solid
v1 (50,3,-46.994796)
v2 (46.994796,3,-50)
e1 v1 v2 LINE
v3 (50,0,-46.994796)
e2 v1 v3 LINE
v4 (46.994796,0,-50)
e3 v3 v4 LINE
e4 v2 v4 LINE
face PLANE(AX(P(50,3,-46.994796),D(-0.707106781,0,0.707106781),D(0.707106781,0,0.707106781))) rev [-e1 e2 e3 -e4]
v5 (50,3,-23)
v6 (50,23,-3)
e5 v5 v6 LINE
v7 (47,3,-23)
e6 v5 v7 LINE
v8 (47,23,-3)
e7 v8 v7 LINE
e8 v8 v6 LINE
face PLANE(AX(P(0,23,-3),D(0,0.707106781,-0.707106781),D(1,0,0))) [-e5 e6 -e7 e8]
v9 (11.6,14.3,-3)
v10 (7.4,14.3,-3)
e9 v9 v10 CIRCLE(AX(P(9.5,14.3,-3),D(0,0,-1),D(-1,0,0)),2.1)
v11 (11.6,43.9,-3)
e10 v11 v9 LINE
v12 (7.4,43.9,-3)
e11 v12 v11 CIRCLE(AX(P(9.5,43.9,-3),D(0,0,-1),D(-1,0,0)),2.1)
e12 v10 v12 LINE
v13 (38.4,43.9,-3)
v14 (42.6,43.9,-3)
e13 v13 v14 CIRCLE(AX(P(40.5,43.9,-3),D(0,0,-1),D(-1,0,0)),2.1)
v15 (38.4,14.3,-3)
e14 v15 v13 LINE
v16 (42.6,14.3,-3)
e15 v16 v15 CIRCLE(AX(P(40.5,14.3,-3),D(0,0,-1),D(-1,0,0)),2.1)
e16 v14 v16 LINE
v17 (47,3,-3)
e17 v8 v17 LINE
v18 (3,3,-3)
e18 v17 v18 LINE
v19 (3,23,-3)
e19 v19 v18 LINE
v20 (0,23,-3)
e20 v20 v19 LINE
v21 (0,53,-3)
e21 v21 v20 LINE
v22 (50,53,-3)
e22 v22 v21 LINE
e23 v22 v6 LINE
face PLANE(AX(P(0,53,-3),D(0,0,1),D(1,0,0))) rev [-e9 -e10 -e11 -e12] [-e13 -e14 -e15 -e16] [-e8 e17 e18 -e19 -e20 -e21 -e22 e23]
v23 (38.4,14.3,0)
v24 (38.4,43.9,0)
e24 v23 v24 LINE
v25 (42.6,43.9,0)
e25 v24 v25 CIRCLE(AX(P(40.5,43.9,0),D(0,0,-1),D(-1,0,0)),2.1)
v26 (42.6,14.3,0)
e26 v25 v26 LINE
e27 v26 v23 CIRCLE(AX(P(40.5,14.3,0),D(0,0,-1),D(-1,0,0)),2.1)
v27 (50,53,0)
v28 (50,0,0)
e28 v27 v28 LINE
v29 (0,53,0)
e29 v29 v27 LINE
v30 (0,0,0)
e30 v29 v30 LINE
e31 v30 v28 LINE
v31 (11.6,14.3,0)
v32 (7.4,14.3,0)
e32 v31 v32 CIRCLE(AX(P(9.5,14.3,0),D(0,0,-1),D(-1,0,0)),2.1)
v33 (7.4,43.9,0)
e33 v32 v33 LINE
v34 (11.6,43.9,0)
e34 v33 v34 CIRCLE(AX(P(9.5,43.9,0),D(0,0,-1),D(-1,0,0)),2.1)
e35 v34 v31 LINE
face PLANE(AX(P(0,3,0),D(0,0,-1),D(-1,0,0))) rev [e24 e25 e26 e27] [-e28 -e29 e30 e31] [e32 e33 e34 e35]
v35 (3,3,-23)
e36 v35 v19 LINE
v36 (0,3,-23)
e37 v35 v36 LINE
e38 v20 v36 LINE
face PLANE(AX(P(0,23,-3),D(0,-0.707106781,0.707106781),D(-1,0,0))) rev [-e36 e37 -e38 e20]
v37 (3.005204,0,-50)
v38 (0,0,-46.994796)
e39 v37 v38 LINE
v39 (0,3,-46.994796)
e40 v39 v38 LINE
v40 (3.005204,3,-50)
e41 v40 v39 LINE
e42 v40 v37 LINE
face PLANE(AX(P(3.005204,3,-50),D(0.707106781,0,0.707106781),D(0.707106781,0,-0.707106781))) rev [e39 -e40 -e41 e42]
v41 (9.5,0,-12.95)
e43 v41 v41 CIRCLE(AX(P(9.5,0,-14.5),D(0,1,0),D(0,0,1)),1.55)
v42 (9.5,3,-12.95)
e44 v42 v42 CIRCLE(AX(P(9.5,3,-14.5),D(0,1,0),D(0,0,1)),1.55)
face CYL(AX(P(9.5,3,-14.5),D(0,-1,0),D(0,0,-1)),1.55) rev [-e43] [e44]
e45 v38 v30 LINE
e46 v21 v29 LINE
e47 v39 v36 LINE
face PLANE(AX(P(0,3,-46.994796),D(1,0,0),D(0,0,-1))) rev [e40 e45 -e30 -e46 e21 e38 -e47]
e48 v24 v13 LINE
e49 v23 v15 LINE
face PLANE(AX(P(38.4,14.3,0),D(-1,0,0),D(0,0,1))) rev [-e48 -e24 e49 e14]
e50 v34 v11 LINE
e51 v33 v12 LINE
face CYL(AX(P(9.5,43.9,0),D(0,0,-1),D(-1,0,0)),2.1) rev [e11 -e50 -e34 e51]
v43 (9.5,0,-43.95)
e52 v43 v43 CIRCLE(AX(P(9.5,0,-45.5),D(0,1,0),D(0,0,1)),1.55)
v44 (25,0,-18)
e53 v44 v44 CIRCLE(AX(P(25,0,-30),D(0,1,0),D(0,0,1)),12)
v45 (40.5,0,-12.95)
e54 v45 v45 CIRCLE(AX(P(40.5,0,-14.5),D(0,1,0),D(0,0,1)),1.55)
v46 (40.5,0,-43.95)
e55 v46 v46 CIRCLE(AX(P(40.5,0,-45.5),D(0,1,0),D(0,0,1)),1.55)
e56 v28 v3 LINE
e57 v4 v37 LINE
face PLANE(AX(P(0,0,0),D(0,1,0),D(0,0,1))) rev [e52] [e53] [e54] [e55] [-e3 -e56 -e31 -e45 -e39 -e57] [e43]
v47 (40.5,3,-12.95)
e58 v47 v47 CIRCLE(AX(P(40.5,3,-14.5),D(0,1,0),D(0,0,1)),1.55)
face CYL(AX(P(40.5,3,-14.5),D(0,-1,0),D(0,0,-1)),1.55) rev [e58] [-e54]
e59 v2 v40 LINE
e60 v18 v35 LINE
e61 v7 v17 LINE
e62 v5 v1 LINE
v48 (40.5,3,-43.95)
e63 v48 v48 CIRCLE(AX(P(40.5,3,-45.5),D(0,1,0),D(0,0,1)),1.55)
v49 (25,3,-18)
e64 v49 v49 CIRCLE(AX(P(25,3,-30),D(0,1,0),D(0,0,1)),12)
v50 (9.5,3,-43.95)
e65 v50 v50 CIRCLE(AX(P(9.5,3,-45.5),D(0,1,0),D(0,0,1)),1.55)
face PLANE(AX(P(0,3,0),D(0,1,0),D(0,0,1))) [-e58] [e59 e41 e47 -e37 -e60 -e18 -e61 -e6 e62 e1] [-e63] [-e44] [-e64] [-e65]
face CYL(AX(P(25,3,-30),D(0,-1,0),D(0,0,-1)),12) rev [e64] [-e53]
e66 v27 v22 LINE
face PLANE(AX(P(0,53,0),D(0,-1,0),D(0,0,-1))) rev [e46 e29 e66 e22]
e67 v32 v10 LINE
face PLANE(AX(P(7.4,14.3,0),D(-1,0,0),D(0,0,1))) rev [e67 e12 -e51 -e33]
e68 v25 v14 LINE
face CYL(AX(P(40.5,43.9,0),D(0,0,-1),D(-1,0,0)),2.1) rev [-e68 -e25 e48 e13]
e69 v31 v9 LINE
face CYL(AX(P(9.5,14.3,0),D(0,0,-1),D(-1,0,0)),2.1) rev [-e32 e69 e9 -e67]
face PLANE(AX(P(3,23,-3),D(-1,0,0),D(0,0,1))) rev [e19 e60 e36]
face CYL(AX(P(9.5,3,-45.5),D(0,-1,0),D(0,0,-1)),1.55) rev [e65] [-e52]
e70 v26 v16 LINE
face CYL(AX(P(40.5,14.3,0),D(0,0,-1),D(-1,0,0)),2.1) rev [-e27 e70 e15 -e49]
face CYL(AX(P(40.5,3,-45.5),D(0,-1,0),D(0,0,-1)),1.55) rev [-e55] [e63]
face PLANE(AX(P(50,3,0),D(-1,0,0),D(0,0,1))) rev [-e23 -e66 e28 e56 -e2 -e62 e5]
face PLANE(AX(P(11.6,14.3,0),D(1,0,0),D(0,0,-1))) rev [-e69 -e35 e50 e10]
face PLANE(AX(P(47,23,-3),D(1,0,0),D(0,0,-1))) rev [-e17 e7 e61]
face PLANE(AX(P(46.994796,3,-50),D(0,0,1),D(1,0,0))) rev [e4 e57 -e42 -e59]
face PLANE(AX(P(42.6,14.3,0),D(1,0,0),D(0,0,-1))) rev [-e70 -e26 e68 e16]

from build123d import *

# Parameters (mm, degrees)
BASESKETCH1_R             = 12
BASESKETCH1_R_2           = 1.55
WIDTHBOSS_EXTRUDE1_DEPTH  = 3
SKETCH2_W                 = 50
SKETCH2_H                 = 3
HEIGHTBOSS_EXTRUDE2_DEPTH = 50
SLOTSCUT_EXTRUDE1_DEPTH   = 87.706401148
WEDGESKETCH4_W            = 3
WEDGESKETCH4_H            = 20
ANGLEBOSS_EXTRUDE3_DEPTH  = 20
CHAMFER1_SIZE             = 20


with BuildPart() as part:
    # BaseSketch1 → WidthBoss-Extrude1 (new body)
    with BuildSketch(Plane(origin=(0, 0, 0), x_dir=(1, 0, 0), z_dir=(0, 1, 0))):
        Polygon((0, 0), (50, 0), (50, 46.99479618), (46.99479618, 50), (3.00520382, 50), (0, 46.99479618), align=None)
        with Locations(Location((25, 30, 0), (0, 0, 270))):
            Circle(BASESKETCH1_R, mode=Mode.SUBTRACT)
        with Locations(Location((9.5, 45.5, 0), (0, 0, 270))):
            Circle(BASESKETCH1_R_2, mode=Mode.SUBTRACT)
        with Locations(Location((40.5, 45.5, 0), (0, 0, 270))):
            Circle(BASESKETCH1_R_2, mode=Mode.SUBTRACT)
        with Locations(Location((40.5, 14.5, 0), (0, 0, 270))):
            Circle(BASESKETCH1_R_2, mode=Mode.SUBTRACT)
        with Locations(Location((9.5, 14.5, 0), (0, 0, 270))):
            Circle(BASESKETCH1_R_2, mode=Mode.SUBTRACT)
    extrude(amount=WIDTHBOSS_EXTRUDE1_DEPTH)

    # Sketch2 → HeightBoss-Extrude2 (add)
    with BuildSketch(Plane(origin=(0, 3, 0), x_dir=(1, 0, 0), z_dir=(0, 1, 0))):
        with Locations((25, 1.5)):
            Rectangle(SKETCH2_W, SKETCH2_H)
    extrude(amount=HEIGHTBOSS_EXTRUDE2_DEPTH)

    # Sketch3 → SlotsCut-Extrude1 (cut, through all)
    with BuildSketch(Plane(origin=(0, 0, -3), x_dir=(-1, 0, 0), z_dir=(0, 0, -1))):
        with BuildLine():
            Line((-42.6, 14.3), (-42.6, 43.9))
            ThreePointArc((-42.6, 43.9), (-40.5, 46), (-38.4, 43.9))
            Line((-38.4, 43.9), (-38.4, 14.3))
            ThreePointArc((-38.4, 14.3), (-40.5, 12.2), (-42.6, 14.3))
        make_face()
        with BuildLine():
            Line((-11.6, 14.3), (-11.6, 43.9))
            ThreePointArc((-11.6, 43.9), (-9.5, 46), (-7.4, 43.9))
            Line((-7.4, 43.9), (-7.4, 14.3))
            ThreePointArc((-7.4, 14.3), (-9.5, 12.2), (-11.6, 14.3))
        make_face()
    extrude(amount=-SLOTSCUT_EXTRUDE1_DEPTH, mode=Mode.SUBTRACT)

    # WedgeSketch4 → AngleBoss-Extrude3 (add)
    with BuildSketch(Plane(origin=(0, 3, 0), x_dir=(1, 0, 0), z_dir=(0, 1, 0))):
        with Locations((48.5, 13)):
            Rectangle(WEDGESKETCH4_W, WEDGESKETCH4_H)
        with Locations((1.5, 13)):
            Rectangle(WEDGESKETCH4_W, WEDGESKETCH4_H)
    extrude(amount=ANGLEBOSS_EXTRUDE3_DEPTH)

    # Chamfer1
    chamfer1_edges = [part.edges().sort_by_distance(p)[0] for p in [
        (48.5, 23, -23),
        (1.5, 23, -23),
    ]]
    chamfer(chamfer1_edges, length=CHAMFER1_SIZE - 0.0001)  # a hair under: the kernel refuses the full size


solid = part.part
